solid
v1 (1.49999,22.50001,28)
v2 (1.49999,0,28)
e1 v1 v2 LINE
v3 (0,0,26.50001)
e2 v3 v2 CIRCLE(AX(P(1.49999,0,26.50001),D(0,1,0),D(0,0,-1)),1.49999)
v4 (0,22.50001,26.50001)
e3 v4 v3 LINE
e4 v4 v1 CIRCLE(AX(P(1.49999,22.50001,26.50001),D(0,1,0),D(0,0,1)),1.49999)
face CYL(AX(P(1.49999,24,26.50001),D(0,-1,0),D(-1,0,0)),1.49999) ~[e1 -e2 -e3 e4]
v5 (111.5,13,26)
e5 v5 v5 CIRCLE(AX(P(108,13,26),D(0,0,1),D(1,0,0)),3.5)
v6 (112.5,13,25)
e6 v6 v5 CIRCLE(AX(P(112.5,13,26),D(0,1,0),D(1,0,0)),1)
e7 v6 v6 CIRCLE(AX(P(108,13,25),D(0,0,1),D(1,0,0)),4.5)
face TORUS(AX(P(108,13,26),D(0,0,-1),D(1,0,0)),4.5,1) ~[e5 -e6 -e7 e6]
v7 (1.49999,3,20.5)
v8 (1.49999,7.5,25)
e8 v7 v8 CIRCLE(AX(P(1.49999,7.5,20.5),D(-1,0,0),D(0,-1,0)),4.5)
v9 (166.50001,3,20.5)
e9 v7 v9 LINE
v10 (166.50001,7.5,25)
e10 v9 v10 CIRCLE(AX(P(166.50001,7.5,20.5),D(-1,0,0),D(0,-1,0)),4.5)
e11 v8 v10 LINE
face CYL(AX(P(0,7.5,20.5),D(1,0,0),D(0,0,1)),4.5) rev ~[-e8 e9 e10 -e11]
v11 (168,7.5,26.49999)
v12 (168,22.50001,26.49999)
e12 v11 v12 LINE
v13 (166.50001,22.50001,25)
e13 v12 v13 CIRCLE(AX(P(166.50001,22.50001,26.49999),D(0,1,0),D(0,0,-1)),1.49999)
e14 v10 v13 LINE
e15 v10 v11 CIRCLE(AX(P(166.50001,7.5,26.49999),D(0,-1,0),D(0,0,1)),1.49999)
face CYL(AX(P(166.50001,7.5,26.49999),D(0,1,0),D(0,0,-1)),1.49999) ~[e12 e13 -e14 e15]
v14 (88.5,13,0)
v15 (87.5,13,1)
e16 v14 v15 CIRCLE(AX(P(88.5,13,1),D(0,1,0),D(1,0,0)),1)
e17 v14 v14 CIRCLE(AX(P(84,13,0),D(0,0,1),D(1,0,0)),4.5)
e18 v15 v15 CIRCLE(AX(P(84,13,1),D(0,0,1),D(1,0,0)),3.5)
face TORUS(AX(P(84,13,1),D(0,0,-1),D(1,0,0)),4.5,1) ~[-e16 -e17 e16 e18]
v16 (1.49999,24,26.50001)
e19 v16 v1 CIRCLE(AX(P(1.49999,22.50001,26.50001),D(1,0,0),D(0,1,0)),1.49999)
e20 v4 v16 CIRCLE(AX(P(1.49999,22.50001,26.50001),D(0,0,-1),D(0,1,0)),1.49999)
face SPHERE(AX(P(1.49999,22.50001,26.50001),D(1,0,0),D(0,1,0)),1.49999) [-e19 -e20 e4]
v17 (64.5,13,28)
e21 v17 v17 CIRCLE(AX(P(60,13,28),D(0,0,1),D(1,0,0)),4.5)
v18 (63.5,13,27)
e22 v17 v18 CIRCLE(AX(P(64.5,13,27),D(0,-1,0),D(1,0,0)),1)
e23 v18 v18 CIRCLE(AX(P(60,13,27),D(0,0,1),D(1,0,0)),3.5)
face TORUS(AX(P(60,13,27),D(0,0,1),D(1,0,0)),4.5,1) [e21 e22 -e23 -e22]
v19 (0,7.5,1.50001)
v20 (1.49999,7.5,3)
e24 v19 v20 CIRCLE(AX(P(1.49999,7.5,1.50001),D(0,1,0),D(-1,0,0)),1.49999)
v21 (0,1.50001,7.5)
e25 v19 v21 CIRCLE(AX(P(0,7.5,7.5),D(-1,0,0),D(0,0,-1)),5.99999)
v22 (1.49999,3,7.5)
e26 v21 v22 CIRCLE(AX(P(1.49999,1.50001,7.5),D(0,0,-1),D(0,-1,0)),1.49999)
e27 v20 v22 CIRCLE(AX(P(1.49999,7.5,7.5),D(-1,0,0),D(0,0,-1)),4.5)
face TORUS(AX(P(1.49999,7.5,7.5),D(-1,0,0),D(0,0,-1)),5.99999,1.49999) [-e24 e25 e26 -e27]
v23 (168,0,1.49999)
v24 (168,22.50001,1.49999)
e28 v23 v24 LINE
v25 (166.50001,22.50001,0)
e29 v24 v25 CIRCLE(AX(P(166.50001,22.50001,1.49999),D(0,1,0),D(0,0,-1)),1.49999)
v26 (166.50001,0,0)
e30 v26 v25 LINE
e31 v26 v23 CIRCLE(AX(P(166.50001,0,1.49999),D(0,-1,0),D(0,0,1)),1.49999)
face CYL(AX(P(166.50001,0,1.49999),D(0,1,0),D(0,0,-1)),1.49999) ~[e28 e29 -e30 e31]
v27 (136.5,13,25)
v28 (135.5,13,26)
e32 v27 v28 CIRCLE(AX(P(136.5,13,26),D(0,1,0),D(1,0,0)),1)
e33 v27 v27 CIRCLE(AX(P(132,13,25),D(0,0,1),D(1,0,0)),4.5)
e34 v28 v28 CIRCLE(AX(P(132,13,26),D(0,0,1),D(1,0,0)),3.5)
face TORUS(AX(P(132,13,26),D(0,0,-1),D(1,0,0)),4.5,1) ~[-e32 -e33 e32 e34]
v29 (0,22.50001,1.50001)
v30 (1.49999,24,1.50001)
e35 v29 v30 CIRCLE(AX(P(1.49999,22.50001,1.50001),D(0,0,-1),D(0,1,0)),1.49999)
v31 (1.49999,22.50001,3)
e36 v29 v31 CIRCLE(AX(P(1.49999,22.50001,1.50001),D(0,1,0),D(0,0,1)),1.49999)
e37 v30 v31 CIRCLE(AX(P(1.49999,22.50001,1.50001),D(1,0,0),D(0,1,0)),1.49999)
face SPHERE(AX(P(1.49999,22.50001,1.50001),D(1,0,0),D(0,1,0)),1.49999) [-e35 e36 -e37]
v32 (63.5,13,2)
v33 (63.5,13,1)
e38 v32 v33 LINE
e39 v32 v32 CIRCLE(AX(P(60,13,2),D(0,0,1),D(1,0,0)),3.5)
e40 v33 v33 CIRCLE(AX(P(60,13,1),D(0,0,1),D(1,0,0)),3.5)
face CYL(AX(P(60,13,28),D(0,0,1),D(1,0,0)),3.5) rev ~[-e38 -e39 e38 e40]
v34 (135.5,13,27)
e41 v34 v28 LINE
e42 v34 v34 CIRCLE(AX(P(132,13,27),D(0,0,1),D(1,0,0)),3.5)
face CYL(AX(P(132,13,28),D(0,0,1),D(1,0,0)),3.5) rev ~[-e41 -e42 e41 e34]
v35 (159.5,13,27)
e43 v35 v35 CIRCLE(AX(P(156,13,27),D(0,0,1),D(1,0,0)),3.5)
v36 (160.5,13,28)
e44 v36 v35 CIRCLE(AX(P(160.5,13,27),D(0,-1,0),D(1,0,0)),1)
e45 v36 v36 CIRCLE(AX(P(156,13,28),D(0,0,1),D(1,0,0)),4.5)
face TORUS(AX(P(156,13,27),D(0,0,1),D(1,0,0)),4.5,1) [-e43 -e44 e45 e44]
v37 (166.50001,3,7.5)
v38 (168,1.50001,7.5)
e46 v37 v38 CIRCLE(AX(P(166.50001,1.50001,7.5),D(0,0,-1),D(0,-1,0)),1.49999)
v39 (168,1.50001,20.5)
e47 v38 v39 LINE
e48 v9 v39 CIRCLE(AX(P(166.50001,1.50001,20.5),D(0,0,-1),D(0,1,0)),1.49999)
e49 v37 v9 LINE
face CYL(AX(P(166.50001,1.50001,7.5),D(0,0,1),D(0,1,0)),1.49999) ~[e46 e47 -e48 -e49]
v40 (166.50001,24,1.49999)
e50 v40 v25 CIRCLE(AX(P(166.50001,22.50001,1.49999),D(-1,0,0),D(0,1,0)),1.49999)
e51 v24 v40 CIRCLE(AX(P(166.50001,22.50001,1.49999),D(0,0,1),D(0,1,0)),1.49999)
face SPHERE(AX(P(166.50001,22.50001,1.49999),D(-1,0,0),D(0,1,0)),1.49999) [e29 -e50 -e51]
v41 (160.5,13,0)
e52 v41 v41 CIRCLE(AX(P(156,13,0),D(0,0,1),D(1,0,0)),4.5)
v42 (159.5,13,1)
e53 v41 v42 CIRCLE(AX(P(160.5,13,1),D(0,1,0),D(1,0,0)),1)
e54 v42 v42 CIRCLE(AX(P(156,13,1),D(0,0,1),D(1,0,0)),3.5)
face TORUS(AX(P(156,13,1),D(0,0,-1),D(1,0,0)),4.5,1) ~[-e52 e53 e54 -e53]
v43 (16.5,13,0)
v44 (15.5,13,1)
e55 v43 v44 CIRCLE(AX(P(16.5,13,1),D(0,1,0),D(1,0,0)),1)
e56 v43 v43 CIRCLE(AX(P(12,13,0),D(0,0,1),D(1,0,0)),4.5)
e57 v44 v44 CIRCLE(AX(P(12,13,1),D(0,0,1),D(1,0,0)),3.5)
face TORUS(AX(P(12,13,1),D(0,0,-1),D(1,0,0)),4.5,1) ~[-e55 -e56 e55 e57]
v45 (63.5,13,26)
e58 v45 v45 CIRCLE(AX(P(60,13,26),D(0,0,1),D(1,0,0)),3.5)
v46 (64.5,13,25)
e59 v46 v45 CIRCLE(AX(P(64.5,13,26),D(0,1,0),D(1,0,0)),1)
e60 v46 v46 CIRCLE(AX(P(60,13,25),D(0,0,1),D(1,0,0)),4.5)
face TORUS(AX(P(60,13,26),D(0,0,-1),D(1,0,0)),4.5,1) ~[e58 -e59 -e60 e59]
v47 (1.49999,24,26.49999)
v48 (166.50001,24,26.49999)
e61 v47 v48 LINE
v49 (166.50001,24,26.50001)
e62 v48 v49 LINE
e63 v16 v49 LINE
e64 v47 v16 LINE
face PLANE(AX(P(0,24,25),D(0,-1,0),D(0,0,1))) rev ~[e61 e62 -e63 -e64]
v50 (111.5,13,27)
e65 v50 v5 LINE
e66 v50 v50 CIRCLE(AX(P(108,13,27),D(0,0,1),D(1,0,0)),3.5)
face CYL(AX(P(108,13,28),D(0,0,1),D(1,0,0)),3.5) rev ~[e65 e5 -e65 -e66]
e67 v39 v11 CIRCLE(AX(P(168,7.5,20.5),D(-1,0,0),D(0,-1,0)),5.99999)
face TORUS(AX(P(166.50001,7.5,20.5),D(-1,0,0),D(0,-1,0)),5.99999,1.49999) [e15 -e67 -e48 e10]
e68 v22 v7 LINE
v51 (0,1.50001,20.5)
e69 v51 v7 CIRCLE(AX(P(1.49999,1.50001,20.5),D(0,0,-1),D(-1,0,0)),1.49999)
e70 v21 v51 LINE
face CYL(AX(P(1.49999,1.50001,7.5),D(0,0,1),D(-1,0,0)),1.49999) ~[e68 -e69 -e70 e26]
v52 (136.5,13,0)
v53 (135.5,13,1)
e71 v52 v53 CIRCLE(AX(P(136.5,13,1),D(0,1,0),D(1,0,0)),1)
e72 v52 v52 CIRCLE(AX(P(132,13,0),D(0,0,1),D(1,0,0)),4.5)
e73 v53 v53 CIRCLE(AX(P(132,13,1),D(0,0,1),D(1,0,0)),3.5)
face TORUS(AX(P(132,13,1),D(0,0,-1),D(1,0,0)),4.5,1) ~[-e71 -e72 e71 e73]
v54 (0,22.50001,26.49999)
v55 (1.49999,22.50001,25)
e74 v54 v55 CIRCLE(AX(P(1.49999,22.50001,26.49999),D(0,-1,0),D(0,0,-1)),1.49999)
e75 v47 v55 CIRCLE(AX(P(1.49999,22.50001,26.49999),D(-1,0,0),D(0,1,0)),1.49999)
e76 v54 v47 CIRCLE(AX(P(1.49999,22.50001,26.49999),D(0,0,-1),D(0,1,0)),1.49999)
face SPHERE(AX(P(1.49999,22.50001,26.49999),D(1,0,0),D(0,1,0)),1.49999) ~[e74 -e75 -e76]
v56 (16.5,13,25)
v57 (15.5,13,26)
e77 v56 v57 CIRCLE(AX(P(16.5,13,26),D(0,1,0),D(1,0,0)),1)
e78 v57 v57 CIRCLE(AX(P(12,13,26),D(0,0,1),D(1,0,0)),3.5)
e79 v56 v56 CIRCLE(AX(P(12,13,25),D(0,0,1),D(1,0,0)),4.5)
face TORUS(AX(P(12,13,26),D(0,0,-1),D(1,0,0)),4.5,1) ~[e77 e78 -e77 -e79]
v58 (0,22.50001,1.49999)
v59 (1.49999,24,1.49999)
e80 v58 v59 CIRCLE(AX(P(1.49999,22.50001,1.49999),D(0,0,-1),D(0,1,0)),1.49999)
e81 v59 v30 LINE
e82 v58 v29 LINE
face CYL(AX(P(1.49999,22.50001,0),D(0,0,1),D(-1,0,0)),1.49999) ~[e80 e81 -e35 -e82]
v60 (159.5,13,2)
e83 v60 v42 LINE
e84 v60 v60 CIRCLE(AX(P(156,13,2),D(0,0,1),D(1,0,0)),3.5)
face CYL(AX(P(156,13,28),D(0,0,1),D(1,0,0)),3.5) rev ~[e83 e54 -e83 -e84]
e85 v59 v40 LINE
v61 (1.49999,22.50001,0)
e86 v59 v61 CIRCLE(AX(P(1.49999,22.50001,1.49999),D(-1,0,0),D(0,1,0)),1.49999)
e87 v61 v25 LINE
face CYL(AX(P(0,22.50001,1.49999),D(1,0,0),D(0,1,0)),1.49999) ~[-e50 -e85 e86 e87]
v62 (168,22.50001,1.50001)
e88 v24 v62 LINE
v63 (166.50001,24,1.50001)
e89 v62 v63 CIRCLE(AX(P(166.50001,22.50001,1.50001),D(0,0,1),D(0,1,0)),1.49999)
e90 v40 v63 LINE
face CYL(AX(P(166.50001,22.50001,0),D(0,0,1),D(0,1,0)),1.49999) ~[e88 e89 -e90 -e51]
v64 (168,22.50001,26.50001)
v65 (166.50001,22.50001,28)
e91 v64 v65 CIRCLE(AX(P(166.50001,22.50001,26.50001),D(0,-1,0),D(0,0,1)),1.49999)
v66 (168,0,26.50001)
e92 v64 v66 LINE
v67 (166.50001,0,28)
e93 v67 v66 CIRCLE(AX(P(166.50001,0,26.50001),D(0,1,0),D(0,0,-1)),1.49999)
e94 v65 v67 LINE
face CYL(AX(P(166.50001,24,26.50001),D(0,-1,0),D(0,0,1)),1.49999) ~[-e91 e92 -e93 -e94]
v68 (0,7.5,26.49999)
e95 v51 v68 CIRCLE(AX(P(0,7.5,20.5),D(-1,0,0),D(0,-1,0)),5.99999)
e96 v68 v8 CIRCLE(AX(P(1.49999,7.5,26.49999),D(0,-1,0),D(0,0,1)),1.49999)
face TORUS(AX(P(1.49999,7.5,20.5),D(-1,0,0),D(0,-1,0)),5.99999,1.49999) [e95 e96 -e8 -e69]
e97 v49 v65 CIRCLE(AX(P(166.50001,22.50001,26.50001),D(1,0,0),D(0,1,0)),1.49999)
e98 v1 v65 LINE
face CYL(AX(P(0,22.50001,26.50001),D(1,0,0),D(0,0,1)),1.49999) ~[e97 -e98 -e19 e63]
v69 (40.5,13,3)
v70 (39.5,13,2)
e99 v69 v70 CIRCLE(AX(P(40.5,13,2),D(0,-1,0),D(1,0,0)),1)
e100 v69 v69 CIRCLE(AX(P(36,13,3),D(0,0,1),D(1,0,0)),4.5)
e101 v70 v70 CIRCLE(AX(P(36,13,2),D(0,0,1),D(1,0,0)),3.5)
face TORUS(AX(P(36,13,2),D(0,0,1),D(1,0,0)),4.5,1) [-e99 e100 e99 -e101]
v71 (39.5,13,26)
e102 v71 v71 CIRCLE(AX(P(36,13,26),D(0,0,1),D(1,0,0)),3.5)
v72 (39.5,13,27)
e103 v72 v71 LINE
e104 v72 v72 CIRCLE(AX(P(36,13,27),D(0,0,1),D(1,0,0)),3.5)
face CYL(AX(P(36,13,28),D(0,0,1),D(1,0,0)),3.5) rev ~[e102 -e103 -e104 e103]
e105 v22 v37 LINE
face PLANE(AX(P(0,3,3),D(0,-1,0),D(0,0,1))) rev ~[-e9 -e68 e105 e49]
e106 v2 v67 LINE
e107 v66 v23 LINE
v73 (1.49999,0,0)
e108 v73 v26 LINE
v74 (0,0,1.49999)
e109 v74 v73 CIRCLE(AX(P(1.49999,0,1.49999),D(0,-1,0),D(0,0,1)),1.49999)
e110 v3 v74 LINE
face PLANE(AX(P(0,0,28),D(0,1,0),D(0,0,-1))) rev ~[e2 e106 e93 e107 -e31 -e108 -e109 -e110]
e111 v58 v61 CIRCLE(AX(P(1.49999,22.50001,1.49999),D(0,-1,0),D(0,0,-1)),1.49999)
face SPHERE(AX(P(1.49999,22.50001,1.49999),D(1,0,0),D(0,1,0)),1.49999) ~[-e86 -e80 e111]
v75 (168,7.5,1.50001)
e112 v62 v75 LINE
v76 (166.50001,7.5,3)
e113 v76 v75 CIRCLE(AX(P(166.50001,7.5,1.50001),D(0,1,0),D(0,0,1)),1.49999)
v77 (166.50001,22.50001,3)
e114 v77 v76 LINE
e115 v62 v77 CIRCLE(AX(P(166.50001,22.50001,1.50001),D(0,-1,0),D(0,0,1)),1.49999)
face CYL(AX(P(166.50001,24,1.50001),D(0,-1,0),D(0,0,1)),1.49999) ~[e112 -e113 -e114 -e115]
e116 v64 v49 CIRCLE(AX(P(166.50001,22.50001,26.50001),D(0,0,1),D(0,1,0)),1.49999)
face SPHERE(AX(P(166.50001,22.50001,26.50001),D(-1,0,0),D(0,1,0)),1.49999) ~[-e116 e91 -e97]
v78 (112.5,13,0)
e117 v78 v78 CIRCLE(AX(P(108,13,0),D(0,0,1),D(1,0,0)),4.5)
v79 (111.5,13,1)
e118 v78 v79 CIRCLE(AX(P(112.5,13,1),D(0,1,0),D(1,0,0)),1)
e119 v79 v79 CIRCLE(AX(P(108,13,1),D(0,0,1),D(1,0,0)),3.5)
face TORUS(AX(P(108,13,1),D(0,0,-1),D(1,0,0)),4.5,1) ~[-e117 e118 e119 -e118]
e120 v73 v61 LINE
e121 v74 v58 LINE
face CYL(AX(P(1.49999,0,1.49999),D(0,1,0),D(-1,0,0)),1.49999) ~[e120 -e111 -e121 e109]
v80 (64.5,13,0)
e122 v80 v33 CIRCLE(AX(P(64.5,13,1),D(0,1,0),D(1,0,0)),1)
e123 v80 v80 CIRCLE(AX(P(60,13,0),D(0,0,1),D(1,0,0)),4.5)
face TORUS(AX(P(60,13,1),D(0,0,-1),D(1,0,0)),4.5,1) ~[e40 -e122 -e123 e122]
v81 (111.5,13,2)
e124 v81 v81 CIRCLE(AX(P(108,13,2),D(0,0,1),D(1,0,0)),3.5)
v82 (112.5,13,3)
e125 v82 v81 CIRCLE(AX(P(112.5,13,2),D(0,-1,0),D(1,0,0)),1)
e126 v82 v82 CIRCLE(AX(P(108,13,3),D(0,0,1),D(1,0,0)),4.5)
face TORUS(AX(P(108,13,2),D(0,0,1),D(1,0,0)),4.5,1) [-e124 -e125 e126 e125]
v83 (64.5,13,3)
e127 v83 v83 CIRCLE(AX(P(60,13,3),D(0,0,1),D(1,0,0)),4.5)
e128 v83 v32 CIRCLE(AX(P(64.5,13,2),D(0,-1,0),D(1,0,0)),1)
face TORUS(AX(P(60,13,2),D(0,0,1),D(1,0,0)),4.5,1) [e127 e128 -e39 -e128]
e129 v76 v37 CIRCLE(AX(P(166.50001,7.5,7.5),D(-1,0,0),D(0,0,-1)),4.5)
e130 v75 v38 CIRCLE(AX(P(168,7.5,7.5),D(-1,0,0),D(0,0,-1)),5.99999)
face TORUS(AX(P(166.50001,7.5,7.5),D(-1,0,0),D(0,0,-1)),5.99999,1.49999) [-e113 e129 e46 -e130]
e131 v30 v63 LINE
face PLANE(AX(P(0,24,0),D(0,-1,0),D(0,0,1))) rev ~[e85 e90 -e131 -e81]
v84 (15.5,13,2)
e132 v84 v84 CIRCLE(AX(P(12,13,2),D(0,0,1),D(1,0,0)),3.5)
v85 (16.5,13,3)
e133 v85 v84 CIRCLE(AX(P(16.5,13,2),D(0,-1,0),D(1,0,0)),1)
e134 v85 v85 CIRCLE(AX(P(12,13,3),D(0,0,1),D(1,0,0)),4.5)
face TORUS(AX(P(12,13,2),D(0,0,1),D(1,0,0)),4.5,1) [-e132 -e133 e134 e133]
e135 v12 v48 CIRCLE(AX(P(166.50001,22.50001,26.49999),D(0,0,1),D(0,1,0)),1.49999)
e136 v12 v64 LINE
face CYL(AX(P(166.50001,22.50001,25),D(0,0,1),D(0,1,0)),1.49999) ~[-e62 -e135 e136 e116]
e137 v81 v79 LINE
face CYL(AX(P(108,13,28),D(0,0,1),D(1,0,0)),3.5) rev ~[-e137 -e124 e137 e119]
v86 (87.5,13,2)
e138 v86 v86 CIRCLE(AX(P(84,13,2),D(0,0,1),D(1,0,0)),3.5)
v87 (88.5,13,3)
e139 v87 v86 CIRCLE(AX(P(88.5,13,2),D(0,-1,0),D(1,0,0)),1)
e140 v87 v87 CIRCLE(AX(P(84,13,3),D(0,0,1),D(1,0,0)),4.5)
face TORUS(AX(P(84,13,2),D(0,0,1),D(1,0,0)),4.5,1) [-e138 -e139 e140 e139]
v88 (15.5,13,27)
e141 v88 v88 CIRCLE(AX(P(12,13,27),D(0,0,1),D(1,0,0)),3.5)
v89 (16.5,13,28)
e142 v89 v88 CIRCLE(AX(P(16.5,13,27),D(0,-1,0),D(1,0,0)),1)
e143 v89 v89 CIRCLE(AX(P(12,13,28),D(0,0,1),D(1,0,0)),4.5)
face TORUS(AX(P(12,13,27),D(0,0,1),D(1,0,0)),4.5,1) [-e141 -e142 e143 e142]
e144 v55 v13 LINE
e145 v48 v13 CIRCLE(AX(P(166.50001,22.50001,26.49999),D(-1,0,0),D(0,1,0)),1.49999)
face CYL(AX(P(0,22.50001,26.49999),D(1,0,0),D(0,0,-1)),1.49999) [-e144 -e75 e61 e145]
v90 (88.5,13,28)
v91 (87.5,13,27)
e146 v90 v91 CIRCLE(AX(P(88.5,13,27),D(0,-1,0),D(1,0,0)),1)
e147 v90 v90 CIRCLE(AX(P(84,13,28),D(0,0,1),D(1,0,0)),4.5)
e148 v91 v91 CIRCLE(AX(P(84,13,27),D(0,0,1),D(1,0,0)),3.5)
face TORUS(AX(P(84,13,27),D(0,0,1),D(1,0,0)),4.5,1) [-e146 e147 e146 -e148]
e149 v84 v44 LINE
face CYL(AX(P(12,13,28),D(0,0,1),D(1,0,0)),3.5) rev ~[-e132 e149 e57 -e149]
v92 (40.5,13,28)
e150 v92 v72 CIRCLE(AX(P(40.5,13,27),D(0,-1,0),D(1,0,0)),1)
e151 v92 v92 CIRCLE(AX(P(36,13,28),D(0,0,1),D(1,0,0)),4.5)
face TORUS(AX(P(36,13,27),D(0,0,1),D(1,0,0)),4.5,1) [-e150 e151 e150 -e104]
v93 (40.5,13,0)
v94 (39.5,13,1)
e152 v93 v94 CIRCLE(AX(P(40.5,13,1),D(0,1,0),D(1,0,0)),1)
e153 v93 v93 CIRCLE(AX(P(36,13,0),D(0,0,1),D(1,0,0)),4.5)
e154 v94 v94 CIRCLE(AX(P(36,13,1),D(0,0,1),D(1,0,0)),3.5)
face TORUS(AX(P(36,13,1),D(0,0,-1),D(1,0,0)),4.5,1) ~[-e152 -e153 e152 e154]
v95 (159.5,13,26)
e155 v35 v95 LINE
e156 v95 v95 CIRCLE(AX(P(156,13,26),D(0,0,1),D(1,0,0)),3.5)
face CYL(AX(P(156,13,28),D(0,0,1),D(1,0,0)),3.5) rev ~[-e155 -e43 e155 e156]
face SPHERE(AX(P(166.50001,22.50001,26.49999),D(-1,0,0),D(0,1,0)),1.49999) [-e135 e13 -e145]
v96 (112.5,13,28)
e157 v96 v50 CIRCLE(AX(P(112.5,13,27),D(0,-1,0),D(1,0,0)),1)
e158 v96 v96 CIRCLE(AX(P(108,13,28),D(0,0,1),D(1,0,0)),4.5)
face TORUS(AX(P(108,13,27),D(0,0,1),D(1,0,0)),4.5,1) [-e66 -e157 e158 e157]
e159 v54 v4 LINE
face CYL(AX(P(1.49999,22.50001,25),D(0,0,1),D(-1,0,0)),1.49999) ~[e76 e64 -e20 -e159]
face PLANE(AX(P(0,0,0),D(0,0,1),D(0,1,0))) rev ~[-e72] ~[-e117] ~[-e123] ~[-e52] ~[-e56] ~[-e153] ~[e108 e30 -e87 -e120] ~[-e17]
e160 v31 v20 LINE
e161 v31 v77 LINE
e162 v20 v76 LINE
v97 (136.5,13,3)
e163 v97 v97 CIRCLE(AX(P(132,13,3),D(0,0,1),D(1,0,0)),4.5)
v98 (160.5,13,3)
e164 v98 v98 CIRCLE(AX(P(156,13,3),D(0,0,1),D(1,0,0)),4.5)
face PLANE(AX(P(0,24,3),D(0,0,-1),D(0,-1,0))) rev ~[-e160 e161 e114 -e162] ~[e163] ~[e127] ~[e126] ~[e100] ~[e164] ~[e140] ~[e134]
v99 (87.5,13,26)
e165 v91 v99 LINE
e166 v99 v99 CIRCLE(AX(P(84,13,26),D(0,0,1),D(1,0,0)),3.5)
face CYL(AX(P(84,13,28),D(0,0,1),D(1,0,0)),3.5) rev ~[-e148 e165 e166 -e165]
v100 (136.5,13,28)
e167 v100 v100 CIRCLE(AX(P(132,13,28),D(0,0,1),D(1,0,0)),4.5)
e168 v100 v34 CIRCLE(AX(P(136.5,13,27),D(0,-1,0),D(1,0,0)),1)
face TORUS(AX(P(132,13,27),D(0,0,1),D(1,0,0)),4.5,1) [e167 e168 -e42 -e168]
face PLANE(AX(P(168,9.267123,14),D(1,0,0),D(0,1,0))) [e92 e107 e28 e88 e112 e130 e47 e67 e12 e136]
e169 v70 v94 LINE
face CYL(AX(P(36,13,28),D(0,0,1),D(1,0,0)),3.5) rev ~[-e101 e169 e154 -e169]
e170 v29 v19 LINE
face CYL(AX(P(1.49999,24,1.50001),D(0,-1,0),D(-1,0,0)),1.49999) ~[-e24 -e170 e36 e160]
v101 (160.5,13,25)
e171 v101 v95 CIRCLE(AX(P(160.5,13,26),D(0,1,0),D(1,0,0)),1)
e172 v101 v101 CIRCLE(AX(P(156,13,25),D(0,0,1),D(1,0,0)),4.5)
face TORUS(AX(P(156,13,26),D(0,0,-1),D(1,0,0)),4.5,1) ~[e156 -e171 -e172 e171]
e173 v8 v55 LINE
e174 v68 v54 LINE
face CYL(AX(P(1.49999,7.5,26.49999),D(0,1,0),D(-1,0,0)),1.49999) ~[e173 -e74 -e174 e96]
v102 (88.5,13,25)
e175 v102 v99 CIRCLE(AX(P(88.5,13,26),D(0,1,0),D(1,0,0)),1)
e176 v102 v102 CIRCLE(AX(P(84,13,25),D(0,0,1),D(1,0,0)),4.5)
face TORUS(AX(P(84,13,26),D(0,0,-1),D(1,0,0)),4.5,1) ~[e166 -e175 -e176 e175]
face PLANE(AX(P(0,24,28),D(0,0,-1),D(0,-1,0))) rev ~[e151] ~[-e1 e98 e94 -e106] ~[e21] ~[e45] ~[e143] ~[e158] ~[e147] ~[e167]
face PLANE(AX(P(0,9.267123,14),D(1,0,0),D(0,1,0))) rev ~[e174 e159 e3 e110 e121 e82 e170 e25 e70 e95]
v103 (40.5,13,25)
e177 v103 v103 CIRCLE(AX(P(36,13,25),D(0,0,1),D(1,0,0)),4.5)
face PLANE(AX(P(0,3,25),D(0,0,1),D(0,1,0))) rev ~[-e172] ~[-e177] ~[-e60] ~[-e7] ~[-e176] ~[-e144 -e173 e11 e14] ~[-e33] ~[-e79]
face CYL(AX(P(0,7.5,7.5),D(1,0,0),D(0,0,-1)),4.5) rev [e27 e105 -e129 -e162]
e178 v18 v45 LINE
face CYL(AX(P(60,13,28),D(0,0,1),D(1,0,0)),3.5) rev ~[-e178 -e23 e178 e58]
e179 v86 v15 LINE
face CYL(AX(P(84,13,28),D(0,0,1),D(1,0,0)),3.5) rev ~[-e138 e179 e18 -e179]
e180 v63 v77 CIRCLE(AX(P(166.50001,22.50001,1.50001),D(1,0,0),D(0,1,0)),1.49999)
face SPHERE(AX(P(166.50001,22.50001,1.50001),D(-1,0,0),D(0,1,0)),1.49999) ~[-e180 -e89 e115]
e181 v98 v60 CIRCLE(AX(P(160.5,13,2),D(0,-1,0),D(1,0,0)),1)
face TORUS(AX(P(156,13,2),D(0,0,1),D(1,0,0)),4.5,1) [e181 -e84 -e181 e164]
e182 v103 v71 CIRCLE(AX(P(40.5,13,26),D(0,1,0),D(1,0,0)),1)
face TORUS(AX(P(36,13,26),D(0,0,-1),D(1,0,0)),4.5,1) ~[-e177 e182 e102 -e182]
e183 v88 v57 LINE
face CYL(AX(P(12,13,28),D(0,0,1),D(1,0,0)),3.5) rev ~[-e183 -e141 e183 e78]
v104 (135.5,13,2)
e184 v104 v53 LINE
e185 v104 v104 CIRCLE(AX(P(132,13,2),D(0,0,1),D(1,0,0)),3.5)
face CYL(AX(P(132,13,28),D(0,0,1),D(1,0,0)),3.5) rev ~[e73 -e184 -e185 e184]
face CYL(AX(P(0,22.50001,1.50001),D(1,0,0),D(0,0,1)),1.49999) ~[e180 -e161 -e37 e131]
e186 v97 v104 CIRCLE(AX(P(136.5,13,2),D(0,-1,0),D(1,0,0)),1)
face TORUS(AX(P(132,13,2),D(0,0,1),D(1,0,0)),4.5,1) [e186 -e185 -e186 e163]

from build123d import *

# Parameters (mm, degrees)
F1_DEPTH = 168
F2_R     = 3.5
F3_DEPTH = 28.001
F4_R     = 4.5
F5_R     = 1.49999
F6_R     = 1


# Not quite as in the source:
# - a fillet or chamfer is up to 0.001 mm smaller than in the source, because OpenCascade refuses the exact size


with BuildPart() as f1:
    # F0 (on Right) → F1 (new body)
    with BuildSketch(Plane.YZ):
        Polygon((24, 28), (0, 28), (0, 0), (24, 0), (24, 3), (3, 3), (3, 25), (24, 25), align=None)
    extrude(amount=F1_DEPTH)

    # F2 (on face) → F3 (cut, through all)
    with BuildSketch(Plane.XY.offset(28)):
        with Locations((12, 13)):
            Circle(F2_R)
        with Locations((36, 13)):
            Circle(F2_R)
        with Locations((60, 13)):
            Circle(F2_R)
        with Locations((84, 13)):
            Circle(F2_R)
        with Locations((108, 13)):
            Circle(F2_R)
        with Locations((132, 13)):
            Circle(F2_R)
        with Locations((156, 13)):
            Circle(F2_R)
    extrude(amount=-F3_DEPTH, mode=Mode.SUBTRACT)

    # F4
    f4_edges = [f1.edges().sort_by_distance(p)[0] for p in [
        (84, 3, 3),
        (84, 3, 25),
    ]]
    fillet(f4_edges, radius=F4_R)

    # F5 (radius 1.5 in the source; OpenCascade refuses exactly that, so slightly less here)
    f5_edges = [f1.edges().sort_by_distance(p)[0] for p in [
        (84, 24, 3),
        (84, 24, 25),
        (84, 24, 28),
        (84, 24, 0),
        (0, 24, 1.5),
        (0, 24, 26.5),
        (168, 24, 1.5),
        (168, 24, 26.5),
        (168, 12, 0),
        (168, 15.75, 3),
        (168, 12, 28),
        (0, 15.75, 25),
        (0, 12, 28),
        (0, 12, 0),
    ]]
    fillet(f5_edges, radius=F5_R)

    # F6
    f6_edges = [f1.edges().sort_by_distance(p)[0] for p in [
        (8.5, 13, 28),
        (32.5, 13, 28),
        (8.5, 13, 25),
        (32.5, 13, 25),
        (56.5, 13, 28),
        (56.5, 13, 25),
        (80.5, 13, 28),
        (80.5, 13, 25),
        (104.5, 13, 28),
        (104.5, 13, 25),
        (128.5, 13, 28),
        (8.5, 13, 0),
        (32.5, 13, 0),
        (32.5, 13, 3),
        (8.5, 13, 3),
        (56.5, 13, 0),
        (80.5, 13, 0),
        (104.5, 13, 0),
        (128.5, 13, 0),
        (152.5, 13, 0),
        (56.5, 13, 3),
        (80.5, 13, 3),
        (104.5, 13, 3),
        (128.5, 13, 3),
        (152.5, 13, 3),
        (128.5, 13, 25),
        (152.5, 13, 25),
        (152.5, 13, 28),
    ]]
    fillet(f6_edges, radius=F6_R)


solid = f1.part
